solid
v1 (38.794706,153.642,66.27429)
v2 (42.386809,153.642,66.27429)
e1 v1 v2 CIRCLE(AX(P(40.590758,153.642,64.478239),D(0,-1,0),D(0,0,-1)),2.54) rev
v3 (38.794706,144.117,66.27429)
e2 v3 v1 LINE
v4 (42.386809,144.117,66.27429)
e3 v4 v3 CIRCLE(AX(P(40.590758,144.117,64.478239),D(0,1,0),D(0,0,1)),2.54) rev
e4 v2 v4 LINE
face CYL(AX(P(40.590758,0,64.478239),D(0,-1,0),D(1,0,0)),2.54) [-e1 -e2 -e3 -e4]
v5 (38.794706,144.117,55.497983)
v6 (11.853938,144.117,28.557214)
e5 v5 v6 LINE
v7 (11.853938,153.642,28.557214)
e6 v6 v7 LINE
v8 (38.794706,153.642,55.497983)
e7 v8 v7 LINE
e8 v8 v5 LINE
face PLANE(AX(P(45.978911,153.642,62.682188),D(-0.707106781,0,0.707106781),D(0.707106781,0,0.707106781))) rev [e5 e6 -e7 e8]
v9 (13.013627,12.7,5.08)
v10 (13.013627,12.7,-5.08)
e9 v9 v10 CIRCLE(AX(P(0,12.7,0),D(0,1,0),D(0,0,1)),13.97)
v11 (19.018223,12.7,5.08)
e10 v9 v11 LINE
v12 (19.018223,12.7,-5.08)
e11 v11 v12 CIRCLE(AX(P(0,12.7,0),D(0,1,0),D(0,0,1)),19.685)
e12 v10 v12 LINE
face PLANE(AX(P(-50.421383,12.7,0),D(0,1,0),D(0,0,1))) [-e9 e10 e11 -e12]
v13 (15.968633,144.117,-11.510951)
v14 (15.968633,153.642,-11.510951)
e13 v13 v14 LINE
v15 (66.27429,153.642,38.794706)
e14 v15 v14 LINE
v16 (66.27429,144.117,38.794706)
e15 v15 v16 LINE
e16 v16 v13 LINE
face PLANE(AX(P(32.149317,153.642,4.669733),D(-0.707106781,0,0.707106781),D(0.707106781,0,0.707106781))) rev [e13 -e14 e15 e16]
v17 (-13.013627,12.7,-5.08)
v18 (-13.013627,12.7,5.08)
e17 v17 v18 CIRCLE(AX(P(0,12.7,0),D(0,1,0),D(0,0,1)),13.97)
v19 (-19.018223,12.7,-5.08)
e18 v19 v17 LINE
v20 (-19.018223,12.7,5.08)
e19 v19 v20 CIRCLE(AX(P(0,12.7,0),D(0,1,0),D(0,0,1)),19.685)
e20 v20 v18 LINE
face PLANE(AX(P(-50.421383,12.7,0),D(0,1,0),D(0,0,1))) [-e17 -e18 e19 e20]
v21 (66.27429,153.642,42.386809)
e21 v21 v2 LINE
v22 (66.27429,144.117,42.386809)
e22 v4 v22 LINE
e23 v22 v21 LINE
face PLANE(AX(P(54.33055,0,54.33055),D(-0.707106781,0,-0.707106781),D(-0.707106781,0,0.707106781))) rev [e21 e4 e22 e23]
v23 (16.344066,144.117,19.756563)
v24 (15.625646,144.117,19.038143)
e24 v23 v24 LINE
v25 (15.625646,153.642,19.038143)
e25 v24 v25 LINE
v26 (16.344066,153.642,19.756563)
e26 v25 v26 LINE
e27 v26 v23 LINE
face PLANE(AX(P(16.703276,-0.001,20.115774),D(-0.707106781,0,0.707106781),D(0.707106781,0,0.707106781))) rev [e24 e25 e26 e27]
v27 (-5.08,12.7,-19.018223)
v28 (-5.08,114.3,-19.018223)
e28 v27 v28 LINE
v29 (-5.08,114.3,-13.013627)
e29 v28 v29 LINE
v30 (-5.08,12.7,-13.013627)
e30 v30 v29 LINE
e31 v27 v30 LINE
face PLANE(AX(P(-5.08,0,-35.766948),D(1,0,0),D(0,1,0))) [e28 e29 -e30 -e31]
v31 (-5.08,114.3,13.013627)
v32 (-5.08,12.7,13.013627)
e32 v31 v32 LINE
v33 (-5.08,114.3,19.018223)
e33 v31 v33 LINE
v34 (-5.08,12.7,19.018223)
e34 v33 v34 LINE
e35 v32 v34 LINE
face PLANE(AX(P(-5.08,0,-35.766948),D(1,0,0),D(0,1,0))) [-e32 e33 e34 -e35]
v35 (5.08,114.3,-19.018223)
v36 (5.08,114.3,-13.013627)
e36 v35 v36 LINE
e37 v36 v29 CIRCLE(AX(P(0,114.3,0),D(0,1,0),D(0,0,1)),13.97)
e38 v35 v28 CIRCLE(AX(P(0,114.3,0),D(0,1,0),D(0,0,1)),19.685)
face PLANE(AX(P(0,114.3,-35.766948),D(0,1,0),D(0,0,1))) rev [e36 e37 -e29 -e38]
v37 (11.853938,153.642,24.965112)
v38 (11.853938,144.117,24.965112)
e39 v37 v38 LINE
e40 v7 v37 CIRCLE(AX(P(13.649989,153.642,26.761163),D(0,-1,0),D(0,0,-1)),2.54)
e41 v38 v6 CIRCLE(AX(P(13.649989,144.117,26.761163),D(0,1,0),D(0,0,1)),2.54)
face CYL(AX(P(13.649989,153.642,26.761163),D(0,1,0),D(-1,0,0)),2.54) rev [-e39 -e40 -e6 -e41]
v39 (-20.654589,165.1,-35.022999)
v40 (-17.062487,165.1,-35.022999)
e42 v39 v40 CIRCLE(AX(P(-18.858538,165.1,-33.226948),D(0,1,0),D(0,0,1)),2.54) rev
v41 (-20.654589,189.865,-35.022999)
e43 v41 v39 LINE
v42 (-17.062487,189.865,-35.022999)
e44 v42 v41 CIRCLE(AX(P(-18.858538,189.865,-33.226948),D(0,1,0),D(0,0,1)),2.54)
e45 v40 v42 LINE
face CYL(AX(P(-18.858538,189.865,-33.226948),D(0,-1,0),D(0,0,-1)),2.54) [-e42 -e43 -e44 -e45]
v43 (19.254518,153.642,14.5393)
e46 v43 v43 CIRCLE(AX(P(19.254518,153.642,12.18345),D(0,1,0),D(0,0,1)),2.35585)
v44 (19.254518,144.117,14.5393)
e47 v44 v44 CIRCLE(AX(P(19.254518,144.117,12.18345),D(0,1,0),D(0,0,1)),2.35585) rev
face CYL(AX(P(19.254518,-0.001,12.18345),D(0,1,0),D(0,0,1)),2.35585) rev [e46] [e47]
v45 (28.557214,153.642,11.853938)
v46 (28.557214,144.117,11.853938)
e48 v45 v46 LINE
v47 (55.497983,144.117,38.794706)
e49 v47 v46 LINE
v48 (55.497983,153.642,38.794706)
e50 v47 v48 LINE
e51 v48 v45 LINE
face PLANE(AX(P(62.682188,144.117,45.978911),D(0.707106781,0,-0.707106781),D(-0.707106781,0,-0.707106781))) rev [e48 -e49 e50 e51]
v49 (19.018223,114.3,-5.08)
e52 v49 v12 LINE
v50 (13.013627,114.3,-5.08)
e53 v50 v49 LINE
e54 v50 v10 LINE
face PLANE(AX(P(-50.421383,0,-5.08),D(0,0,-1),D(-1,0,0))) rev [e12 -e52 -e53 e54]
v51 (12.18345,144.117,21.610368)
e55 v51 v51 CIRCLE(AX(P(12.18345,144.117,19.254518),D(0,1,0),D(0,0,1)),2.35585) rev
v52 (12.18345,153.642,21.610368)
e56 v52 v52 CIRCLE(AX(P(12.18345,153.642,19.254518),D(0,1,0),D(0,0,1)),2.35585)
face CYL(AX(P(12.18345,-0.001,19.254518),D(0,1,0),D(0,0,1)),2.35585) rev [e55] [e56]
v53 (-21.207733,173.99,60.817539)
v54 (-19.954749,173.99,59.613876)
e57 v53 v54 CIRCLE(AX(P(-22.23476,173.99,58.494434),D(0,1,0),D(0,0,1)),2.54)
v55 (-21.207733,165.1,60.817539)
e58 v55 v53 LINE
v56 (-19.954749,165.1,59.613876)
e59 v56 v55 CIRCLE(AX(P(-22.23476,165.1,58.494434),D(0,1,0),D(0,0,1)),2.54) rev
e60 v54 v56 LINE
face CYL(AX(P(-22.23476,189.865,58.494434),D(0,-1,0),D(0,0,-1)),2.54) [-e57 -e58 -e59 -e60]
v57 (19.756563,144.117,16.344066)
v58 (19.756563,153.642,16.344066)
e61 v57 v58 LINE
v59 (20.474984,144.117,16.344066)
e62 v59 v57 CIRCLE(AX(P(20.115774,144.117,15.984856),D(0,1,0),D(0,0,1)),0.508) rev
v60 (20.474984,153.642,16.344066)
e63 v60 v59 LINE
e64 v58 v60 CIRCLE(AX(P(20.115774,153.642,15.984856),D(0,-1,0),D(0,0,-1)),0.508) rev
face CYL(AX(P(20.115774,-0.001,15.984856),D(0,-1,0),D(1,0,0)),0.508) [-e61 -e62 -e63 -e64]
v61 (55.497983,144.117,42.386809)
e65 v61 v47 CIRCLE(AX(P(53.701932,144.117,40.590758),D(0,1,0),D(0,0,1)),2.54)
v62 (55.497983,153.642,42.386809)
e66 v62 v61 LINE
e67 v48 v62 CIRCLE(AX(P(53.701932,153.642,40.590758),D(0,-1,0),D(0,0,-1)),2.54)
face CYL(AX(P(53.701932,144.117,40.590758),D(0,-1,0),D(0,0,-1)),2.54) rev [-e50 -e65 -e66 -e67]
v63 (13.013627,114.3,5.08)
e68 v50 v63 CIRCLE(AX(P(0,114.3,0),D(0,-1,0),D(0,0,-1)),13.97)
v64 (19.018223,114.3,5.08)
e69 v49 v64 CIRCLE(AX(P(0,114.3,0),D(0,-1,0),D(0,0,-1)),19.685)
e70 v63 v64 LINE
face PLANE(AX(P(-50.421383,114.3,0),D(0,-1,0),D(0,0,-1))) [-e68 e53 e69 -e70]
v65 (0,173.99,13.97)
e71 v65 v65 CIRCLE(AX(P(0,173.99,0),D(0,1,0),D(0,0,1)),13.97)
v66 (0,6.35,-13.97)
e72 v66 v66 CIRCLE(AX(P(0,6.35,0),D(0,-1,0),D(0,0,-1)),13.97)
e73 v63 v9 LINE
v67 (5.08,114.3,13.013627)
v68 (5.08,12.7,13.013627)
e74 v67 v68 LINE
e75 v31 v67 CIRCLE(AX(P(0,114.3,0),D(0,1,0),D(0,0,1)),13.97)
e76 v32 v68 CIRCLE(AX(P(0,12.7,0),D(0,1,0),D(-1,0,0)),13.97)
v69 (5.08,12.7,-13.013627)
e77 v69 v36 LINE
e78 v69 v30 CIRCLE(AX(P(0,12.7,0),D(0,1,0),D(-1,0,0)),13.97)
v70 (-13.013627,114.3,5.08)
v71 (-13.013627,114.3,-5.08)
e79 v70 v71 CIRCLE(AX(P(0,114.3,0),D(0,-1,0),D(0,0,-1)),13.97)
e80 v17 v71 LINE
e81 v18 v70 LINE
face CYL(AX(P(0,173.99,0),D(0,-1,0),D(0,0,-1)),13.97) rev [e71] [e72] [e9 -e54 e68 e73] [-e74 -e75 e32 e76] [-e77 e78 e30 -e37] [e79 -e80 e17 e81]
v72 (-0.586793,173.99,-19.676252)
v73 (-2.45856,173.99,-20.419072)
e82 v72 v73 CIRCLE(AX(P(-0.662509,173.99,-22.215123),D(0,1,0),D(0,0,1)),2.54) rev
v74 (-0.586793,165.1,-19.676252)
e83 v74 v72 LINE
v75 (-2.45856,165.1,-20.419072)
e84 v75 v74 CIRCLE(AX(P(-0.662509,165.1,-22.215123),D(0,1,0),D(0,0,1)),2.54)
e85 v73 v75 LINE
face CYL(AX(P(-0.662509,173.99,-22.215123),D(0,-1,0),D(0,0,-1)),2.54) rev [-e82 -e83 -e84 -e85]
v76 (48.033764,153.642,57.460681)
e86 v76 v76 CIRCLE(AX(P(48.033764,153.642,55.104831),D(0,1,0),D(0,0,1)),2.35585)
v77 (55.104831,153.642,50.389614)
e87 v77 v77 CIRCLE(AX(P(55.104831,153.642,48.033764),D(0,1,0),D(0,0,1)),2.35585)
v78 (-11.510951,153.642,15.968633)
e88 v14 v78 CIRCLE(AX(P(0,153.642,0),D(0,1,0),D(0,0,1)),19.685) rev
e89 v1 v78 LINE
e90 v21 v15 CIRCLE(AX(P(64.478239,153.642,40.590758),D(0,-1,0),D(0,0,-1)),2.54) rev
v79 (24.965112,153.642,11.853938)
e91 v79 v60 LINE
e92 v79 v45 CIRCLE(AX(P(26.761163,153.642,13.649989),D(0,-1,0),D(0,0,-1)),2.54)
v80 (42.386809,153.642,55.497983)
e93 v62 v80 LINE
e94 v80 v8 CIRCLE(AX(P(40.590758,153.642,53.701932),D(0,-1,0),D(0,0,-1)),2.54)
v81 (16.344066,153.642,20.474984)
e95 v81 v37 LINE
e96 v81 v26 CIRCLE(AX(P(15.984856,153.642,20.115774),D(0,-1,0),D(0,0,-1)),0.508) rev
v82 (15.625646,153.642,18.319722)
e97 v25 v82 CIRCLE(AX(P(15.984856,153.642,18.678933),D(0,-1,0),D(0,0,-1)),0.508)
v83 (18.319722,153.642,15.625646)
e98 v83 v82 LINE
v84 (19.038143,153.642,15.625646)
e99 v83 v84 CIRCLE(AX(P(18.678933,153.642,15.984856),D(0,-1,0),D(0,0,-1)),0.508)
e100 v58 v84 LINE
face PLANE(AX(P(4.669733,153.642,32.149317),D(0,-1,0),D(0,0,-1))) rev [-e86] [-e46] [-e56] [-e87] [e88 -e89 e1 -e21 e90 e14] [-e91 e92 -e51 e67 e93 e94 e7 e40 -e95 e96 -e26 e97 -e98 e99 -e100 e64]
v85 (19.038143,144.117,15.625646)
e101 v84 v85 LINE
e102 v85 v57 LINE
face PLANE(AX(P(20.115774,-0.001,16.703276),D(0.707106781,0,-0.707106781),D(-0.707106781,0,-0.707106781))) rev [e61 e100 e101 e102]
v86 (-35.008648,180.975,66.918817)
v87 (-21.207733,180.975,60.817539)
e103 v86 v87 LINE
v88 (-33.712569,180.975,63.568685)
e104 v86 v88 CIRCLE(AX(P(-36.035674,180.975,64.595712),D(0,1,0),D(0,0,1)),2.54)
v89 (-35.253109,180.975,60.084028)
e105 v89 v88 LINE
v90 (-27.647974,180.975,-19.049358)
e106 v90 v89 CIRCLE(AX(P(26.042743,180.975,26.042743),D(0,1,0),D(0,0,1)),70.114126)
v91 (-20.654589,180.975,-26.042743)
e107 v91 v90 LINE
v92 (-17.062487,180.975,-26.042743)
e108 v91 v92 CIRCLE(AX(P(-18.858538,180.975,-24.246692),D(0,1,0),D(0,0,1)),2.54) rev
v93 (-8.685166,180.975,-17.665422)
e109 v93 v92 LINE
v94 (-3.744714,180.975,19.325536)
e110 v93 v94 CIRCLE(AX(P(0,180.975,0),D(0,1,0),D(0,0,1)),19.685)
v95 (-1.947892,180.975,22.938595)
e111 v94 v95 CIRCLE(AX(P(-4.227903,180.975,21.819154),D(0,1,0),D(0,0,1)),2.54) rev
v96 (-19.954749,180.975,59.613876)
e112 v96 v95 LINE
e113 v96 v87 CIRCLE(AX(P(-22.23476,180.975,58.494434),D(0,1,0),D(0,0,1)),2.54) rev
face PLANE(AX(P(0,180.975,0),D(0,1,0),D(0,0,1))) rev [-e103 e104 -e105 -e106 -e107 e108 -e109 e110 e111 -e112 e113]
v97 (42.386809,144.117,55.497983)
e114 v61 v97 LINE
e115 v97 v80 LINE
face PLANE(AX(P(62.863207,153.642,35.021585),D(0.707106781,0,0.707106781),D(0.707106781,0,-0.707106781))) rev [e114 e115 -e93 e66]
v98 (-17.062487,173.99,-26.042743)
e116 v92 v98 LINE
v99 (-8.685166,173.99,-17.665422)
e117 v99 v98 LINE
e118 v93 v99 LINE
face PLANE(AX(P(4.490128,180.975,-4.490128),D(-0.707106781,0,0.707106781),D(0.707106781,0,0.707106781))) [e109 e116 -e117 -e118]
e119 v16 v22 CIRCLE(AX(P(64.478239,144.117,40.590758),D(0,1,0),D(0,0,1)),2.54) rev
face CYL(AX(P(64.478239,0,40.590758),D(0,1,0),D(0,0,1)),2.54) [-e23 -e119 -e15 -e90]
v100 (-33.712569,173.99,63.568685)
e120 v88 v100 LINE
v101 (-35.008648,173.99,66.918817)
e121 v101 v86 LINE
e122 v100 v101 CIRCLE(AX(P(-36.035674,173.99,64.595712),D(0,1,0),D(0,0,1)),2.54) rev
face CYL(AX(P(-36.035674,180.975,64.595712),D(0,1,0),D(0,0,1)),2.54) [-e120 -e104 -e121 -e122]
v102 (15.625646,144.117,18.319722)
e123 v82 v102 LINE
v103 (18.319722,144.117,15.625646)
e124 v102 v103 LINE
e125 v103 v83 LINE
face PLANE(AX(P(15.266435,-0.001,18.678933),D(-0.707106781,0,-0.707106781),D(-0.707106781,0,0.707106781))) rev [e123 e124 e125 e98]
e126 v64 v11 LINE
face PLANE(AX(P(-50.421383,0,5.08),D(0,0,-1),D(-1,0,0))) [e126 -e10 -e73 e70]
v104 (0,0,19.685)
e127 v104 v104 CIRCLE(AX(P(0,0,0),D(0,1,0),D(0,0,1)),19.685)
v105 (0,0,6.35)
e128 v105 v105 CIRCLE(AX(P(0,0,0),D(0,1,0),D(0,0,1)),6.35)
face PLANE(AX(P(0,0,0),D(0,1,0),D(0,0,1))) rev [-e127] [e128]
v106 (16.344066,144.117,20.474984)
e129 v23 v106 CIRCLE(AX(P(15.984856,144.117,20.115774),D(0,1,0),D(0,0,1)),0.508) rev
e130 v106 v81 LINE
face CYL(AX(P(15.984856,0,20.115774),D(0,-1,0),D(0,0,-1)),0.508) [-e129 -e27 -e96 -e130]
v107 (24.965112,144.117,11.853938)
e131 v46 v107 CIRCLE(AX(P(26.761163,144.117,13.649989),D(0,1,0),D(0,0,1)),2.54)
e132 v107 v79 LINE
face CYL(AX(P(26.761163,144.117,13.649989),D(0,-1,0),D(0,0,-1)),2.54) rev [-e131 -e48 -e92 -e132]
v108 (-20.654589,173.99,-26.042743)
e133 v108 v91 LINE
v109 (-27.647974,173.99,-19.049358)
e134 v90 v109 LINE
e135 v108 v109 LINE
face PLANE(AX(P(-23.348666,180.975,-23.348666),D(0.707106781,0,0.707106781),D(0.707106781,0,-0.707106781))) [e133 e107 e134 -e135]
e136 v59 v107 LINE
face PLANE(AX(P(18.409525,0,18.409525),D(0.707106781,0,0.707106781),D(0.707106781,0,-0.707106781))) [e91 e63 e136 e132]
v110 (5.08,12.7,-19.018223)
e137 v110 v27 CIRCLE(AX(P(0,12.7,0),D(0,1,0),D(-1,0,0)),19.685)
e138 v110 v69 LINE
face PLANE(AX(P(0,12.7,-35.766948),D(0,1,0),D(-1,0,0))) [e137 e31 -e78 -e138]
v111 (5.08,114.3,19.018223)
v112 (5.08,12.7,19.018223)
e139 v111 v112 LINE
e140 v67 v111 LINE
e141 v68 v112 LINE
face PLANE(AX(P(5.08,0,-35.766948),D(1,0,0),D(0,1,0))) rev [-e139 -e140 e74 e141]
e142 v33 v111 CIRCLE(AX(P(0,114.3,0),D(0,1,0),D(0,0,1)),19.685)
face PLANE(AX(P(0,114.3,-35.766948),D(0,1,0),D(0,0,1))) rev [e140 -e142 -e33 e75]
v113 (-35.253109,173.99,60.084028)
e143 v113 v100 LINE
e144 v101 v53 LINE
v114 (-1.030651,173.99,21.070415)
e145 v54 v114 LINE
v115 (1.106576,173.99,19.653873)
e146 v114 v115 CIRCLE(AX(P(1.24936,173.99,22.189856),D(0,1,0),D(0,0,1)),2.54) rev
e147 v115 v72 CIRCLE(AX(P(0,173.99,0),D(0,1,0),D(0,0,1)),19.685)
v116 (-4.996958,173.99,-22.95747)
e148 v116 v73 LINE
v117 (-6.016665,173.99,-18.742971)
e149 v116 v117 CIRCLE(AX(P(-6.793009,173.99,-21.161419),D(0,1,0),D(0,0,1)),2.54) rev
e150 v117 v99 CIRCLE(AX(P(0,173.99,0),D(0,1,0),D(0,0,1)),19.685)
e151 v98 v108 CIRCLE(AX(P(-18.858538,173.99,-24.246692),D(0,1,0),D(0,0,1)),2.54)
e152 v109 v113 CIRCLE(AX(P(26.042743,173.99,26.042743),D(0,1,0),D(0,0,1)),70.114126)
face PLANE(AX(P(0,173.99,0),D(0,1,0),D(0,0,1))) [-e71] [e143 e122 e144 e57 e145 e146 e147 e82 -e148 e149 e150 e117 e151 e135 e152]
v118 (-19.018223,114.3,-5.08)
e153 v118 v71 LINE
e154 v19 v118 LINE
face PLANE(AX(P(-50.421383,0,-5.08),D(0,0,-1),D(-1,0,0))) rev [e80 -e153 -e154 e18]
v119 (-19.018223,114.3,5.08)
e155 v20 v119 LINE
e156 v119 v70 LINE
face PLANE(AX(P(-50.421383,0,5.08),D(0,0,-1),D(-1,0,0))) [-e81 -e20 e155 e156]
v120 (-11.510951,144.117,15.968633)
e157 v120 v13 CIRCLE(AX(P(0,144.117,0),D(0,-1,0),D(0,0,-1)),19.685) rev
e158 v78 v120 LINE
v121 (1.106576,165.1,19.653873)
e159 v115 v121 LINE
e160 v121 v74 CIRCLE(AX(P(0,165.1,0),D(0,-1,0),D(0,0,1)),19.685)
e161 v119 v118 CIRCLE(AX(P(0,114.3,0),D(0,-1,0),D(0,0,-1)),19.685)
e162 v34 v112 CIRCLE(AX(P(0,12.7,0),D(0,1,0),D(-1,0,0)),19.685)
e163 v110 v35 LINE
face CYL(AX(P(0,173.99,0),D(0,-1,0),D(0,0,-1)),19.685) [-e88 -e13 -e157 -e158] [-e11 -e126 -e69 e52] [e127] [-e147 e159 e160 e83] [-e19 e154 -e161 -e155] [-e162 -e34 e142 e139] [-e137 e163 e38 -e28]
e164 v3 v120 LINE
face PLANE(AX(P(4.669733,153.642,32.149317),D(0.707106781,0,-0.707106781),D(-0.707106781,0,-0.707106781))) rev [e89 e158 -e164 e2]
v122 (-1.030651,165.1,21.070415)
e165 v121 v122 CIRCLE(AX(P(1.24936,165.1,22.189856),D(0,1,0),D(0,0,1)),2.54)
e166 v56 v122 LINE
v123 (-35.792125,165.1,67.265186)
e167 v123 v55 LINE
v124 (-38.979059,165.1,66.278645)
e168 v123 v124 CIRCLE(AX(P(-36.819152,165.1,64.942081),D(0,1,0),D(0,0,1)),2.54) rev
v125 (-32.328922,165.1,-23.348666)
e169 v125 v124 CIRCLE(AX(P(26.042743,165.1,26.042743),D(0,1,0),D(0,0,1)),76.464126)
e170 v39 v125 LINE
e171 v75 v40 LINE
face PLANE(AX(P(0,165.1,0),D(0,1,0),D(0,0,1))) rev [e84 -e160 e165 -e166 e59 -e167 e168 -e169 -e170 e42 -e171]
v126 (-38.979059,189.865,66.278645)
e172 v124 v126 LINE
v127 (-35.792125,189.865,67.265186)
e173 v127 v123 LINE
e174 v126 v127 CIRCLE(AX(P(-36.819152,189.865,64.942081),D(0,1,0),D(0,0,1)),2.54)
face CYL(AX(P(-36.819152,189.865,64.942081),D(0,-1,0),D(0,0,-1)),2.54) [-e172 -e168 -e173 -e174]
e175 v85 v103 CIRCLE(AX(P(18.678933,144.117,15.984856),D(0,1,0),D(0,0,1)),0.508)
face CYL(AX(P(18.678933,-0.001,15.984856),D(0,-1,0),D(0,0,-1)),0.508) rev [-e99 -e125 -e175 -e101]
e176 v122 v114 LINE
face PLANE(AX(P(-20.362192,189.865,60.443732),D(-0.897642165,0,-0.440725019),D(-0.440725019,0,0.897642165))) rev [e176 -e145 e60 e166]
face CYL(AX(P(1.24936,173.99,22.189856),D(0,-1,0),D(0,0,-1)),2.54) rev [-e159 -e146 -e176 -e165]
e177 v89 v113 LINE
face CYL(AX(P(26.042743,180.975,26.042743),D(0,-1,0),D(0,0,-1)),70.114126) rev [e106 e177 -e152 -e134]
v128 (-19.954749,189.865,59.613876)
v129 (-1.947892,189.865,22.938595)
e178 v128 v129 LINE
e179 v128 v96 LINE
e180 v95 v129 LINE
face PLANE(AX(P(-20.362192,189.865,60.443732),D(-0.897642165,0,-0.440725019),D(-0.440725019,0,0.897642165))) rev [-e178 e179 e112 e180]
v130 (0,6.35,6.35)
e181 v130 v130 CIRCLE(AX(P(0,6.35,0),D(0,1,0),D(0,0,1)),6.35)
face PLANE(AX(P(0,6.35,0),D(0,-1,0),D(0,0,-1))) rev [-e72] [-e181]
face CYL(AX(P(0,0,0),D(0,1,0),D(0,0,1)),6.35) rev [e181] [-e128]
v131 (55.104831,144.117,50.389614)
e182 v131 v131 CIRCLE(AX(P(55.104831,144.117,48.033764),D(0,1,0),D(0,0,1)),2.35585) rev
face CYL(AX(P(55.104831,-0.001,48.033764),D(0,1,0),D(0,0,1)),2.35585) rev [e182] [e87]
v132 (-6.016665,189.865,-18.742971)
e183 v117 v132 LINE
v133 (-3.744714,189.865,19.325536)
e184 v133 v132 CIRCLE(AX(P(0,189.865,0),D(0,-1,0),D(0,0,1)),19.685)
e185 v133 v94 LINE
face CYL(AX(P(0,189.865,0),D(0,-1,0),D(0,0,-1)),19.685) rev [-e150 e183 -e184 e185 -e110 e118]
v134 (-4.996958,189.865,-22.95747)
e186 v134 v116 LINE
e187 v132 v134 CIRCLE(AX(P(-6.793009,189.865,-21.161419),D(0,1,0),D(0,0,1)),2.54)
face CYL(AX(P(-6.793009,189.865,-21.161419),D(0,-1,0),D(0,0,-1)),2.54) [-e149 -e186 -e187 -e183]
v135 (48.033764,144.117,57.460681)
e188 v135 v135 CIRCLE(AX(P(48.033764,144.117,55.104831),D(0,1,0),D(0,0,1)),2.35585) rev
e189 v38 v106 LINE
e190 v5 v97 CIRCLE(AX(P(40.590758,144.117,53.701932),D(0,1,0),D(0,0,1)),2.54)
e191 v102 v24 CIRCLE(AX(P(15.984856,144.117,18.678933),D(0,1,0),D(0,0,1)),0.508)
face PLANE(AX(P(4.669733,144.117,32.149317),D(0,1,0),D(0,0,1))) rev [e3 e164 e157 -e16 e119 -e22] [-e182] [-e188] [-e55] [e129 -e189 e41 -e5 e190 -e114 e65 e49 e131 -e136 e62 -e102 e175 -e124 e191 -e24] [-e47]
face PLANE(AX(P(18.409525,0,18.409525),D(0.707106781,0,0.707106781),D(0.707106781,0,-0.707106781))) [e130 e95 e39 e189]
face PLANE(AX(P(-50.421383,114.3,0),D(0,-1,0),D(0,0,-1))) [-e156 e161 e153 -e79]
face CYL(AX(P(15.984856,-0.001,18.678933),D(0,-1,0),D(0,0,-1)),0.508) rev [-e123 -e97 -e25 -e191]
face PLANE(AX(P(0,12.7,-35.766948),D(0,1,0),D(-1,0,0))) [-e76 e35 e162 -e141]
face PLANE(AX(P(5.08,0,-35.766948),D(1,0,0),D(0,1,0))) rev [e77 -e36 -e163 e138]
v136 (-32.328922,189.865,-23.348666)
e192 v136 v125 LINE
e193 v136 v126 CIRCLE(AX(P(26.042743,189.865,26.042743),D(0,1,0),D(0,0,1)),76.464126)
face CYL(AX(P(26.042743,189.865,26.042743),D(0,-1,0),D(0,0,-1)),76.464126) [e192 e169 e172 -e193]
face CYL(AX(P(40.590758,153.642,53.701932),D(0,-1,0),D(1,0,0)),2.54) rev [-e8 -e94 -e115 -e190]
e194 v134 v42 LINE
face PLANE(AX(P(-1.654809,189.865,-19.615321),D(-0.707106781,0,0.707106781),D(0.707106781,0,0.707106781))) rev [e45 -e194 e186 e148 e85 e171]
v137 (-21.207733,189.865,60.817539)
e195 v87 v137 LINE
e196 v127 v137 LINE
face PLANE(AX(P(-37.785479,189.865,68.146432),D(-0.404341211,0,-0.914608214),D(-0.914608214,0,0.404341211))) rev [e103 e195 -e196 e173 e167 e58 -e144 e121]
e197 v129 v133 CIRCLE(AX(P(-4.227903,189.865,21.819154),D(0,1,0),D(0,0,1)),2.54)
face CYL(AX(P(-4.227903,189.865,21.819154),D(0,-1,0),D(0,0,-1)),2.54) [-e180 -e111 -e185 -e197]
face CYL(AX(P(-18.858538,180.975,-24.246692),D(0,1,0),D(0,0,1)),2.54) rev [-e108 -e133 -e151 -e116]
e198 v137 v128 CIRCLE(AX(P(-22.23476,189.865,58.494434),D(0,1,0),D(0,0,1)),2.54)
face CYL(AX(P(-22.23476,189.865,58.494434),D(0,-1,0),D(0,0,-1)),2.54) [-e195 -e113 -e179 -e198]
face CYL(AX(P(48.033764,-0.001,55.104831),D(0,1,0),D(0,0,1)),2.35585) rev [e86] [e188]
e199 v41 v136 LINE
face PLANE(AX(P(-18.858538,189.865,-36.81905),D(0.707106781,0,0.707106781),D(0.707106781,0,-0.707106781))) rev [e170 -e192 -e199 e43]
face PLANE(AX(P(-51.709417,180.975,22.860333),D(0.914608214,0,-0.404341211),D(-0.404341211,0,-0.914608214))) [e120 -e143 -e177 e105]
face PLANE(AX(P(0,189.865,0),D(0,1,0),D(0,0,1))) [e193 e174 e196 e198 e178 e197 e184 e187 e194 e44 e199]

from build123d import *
from build123d.topology import SkipClean

# Parameters (mm, degrees)
SKETCH1_R                            = 19.685
SKETCH1_R_2                          = 13.97
BOSS_EXTRUDE1_DEPTH                  = 173.99
SKETCH2_R                            = 13.97
BOSS_EXTRUDE2_DEPTH                  = 6.35
SKETCH7_R                            = 6.35
CUT_EXTRUDE4_DEPTH                   = 170.935776251
SKETCH9_W                            = 38.862
SKETCH9_H                            = 9.525
BOSS_EXTRUDE3_DEPTH                  = 6.35
BOSS_EXTRUDE3_DIRECTION_2_REACH      = 182.364
BOSS_EXTRUDE3_DIRECTION_2_END_RADIUS = 19.685
SKETCH10_W                           = 7.62
SKETCH10_H                           = 9.525
BOSS_EXTRUDE4_DEPTH                  = 50.8
BOSS_EXTRUDE5_REACH                  = 201.196
SKETCH11_W                           = 7.62
SKETCH11_H                           = 9.525
FILLET1_R                            = 2.54
CUT_EXTRUDE7_REACH                   = 182.524
SKETCH12_R                           = 2.35585
CUT_EXTRUDE9_REACH                   = 182.524
FILLET5_R                            = 0.508
BOSS_EXTRUDE6_DEPTH                  = 15.875
BOSS_EXTRUDE6_DEPTH_BACK             = 8.89
CUT_EXTRUDE10_DEPTH                  = 6.985
CUT_EXTRUDE11_DEPTH                  = 6.985
FILLET7_R                            = 2.54
FILLET8_R                            = 2.54
FILLET9_R                            = 2.54
CUT_EXTRUDE12_DEPTH                  = 213.353464491
CUT_EXTRUDE12_DEPTH_BACK             = 213.353464491
SKETCH5_W                            = 10.16
SKETCH5_H                            = 25.4
SKETCH5_H_2                          = 76.2
CUT_EXTRUDE13_DEPTH                  = 213.353464491
CUT_EXTRUDE13_DEPTH_BACK             = 213.353464491
SKETCH8_W                            = 10.16
SKETCH8_H                            = 25.4
SKETCH8_H_2                          = 76.2


with BuildPart() as part:
    # Sketch1 → Boss-Extrude1 (new body)
    with BuildSketch(Plane(origin=(0, 0, 0), x_dir=(1, 0, 0), z_dir=(0, 1, 0))):
        with Locations(Location((0, 0, 0), (0, 0, 270))):
            Circle(SKETCH1_R)
        with Locations(Location((0, 0, 0), (0, 0, 270))):
            Circle(SKETCH1_R_2, mode=Mode.SUBTRACT)
    extrude(amount=BOSS_EXTRUDE1_DEPTH)

    # Sketch2 → Boss-Extrude2 (add)
    with BuildSketch(Plane.XZ):
        with Locations(Location((0, 0, 0), (0, 0, 270))):
            Circle(SKETCH2_R)
    extrude(amount=-BOSS_EXTRUDE2_DEPTH)

    # Sketch7 → Cut-Extrude4 (cut, through all)
    with BuildSketch(Plane(origin=(0, 6.35, 0), x_dir=(1, 0, 0), z_dir=(0, 1, 0))):
        with Locations(Location((0, 0, 0), (0, 0, 270))):
            Circle(SKETCH7_R)
    extrude(amount=-CUT_EXTRUDE4_DEPTH, mode=Mode.SUBTRACT)

    # Sketch9 → Boss-Extrude3 (add)
    with BuildSketch(Plane(origin=(13.919396988, 0, 13.919396988), x_dir=(0.7071067811865476, 0, -0.7071067811865476), z_dir=(0.7071067811865476, 0, 0.7071067811865476))):
        with Locations((0, 148.8795)):
            Rectangle(SKETCH9_W, SKETCH9_H)
    extrude(amount=BOSS_EXTRUDE3_DEPTH)

    # Boss-Extrude3 direction 2: up to this cylinder (the profile starts outside it)
    boss_extrude3_direction_2_end = Plane(origin=(0, 148.8795, 0), z_dir=(0, -1, 0)) * Cylinder(BOSS_EXTRUDE3_DIRECTION_2_END_RADIUS, 405.098, mode=Mode.PRIVATE)
    # Sketch9 → Boss-Extrude3 direction 2 (add, up to the surface)
    with BuildSketch(Plane(origin=(13.919396988, 0, 13.919396988), x_dir=(0.7071067811865476, 0, -0.7071067811865476), z_dir=(0.7071067811865476, 0, 0.7071067811865476)), mode=Mode.PRIVATE) as boss_extrude3_direction_2_sk1:
        with Locations((0, 148.8795)):
            Rectangle(SKETCH9_W, SKETCH9_H)
    boss_extrude3_direction_2_tool1 = extrude(boss_extrude3_direction_2_sk1.sketch, amount=-BOSS_EXTRUDE3_DIRECTION_2_REACH, mode=Mode.PRIVATE) - boss_extrude3_direction_2_end
    add(boss_extrude3_direction_2_tool1.solids().sort_by_distance((13.919397, 148.8795, 13.919397))[0])
    add(boss_extrude3_direction_2_tool1.solids().sort_by_distance((13.919397, 148.8795, 13.919397))[1])

    # Sketch10 → Boss-Extrude4 (add)
    with BuildSketch(Plane(origin=(18.409525048, 0, 18.409525048), x_dir=(0.7071067811865481, 0, -0.707106781186547), z_dir=(0.707106781186547, 0, 0.7071067811865481))):
        with Locations((-15.621, 148.8795)):
            Rectangle(SKETCH10_W, SKETCH10_H)
        with Locations((15.621, 148.8795)):
            Rectangle(SKETCH10_W, SKETCH10_H)
    extrude(amount=BOSS_EXTRUDE4_DEPTH)

    # Sketch11 → Boss-Extrude5 (add, up to next)
    with BuildSketch(Plane(origin=(-8.351638193, 0, 8.351638193), x_dir=(-0.7071067811865471, 0, -0.7071067811865479), z_dir=(0.7071067811865479, 0, -0.7071067811865471)), mode=Mode.PRIVATE) as boss_extrude5_sk1:
        with Locations((-73.025, 148.8795)):
            Rectangle(SKETCH11_W, SKETCH11_H)
    boss_extrude5_tool1 = extrude(boss_extrude5_sk1.sketch, amount=BOSS_EXTRUDE5_REACH, mode=Mode.PRIVATE) - part.part
    add(boss_extrude5_tool1.solids().sort_by_distance((43.284835, 148.8795, 59.988111))[0])

    # Fillet1
    fillet1_edges = [part.edges().sort_by_distance(p)[0] for p in [
        (10.057886856, 148.8795, 26.761163241),
        (40.590757667, 148.8795, 68.070341398),
        (26.761163241, 148.8795, 10.057886856),
        (68.070341398, 148.8795, 40.590757667),
        (57.294034052, 148.8795, 40.590757667),
        (40.590757667, 148.8795, 57.294034052),
    ]]
    fillet(fillet1_edges, radius=FILLET1_R)

    # Sketch12 → Cut-Extrude7 (cut, up to next)
    with BuildSketch(Plane(origin=(0, 153.642, 0), x_dir=(1, 0, 0), z_dir=(0, 1, 0)), mode=Mode.PRIVATE) as cut_extrude7_sk1:
        with Locations(Location((48.033763646, -55.104831458, 0), (0, 0, 270))):
            Circle(SKETCH12_R)
    cut_extrude7_tool1 = extrude(cut_extrude7_sk1.sketch, amount=-CUT_EXTRUDE7_REACH, mode=Mode.PRIVATE) & part.part
    # Sketch12 → Cut-Extrude7 (cut, up to next)
    with BuildSketch(Plane(origin=(0, 153.642, 0), x_dir=(1, 0, 0), z_dir=(0, 1, 0)), mode=Mode.PRIVATE) as cut_extrude7_sk2:
        with Locations(Location((55.104831458, -48.033763646, 0), (0, 0, 270))):
            Circle(SKETCH12_R)
    cut_extrude7_tool2 = extrude(cut_extrude7_sk2.sketch, amount=-CUT_EXTRUDE7_REACH, mode=Mode.PRIVATE) & part.part
    # Sketch12 → Cut-Extrude7 (cut, up to next)
    with BuildSketch(Plane(origin=(0, 153.642, 0), x_dir=(1, 0, 0), z_dir=(0, 1, 0)), mode=Mode.PRIVATE) as cut_extrude7_sk3:
        with Locations(Location((19.254517652, -12.18344984, 0), (0, 0, 270))):
            Circle(SKETCH12_R)
    cut_extrude7_tool3 = extrude(cut_extrude7_sk3.sketch, amount=-CUT_EXTRUDE7_REACH, mode=Mode.PRIVATE) & part.part
    # Sketch12 → Cut-Extrude7 (cut, up to next)
    with BuildSketch(Plane(origin=(0, 153.642, 0), x_dir=(1, 0, 0), z_dir=(0, 1, 0)), mode=Mode.PRIVATE) as cut_extrude7_sk4:
        with Locations(Location((12.18344984, -19.254517652, 0), (0, 0, 270))):
            Circle(SKETCH12_R)
    cut_extrude7_tool4 = extrude(cut_extrude7_sk4.sketch, amount=-CUT_EXTRUDE7_REACH, mode=Mode.PRIVATE) & part.part
    add(cut_extrude7_tool1.solids().sort_by_distance((48.033764, 153.642, 55.104831))[0], mode=Mode.SUBTRACT)
    add(cut_extrude7_tool2.solids().sort_by_distance((55.104831, 153.642, 48.033764))[0], mode=Mode.SUBTRACT)
    add(cut_extrude7_tool3.solids().sort_by_distance((19.254518, 153.642, 12.18345))[0], mode=Mode.SUBTRACT)
    add(cut_extrude7_tool4.solids().sort_by_distance((12.18345, 153.642, 19.254518))[0], mode=Mode.SUBTRACT)

    # Sketch22 → Cut-Extrude9 (cut, up to next)
    with BuildSketch(Plane(origin=(0, 153.642, 0), x_dir=(1, 0, 0), z_dir=(0, 1, 0)), mode=Mode.PRIVATE) as cut_extrude9_sk1:
        Polygon((16.703276385, -20.115773711), (20.115773711, -16.703276385), (18.678932732, -15.266435406), (15.266435406, -18.678932732), align=None)
    cut_extrude9_tool1 = extrude(cut_extrude9_sk1.sketch, amount=-CUT_EXTRUDE9_REACH, mode=Mode.PRIVATE) & part.part
    add(cut_extrude9_tool1.solids().sort_by_distance((17.691105, 153.642, 17.691105))[0], mode=Mode.SUBTRACT)

    # Fillet5
    fillet5_edges = [part.edges().sort_by_distance(p)[0] for p in [
        (16.703276385, 148.8795, 20.115773711),
        (15.266435406, 148.8795, 18.678932732),
        (18.678932732, 148.8795, 15.266435406),
        (20.115773711, 148.8795, 16.703276385),
    ]]
    fillet(fillet5_edges, radius=FILLET5_R)

    # Sketch24 → Boss-Extrude6 (add, two sides: drawn at the far end of the back side and taken through both)
    with BuildSketch(Plane(origin=(0, 173.99, 0), x_dir=(1, 0, 0), z_dir=(0, 1, 0)).offset(-BOSS_EXTRUDE6_DEPTH_BACK)):
        with BuildLine():
            Line((-1.654809111, 19.615321354), (-18.858537854, 36.819050096))
            Line((-18.858537854, 36.819050096), (-32.328922036, 23.348665915))
            ThreePointArc((-32.328922036, 23.348665915), (-50.285766243, -21.490686658), (-37.785478501, -68.146432278))
            Line((-37.785478501, -68.146432278), (-20.362192025, -60.443732207))
            Line((-20.362192025, -60.443732207), (-0.348920906, -19.681907408))
            ThreePointArc((-0.348920906, -19.681907408), (-19.674139894, -0.653792342), (-1.654809111, 19.615321354))
        make_face()
    extrude(amount=BOSS_EXTRUDE6_DEPTH + BOSS_EXTRUDE6_DEPTH_BACK)

    # Sketch25 → Cut-Extrude10 (cut)
    with BuildSketch(Plane(origin=(0, 173.99, 0), x_dir=(1, 0, 0), z_dir=(0, 1, 0))):
        with BuildLine():
            ThreePointArc((-27.647974301, 19.049357529), (-43.749813849, -19.335310427), (-35.25310949, -60.084028026))
            Line((-35.25310949, -60.084028026), (-22.929758715, -54.635970049))
            Line((-22.929758715, -54.635970049), (-16.008337298, -51.576063222))
            Line((-16.008337298, -51.576063222), (-0.348920906, -19.681907408))
            ThreePointArc((-0.348920906, -19.681907408), (-19.212220786, -4.288332714), (-8.685165579, 17.665421701))
            Line((-8.685165579, 17.665421701), (-18.858537854, 27.838793975))
            Line((-18.858537854, 27.838793975), (-27.647974301, 19.049357529))
        make_face()
    extrude(amount=CUT_EXTRUDE10_DEPTH, mode=Mode.SUBTRACT)

    # Sketch25<3> → Cut-Extrude11 (cut)
    with BuildSketch(Plane(origin=(0, 173.99, 0), x_dir=(1, 0, 0), z_dir=(0, 1, 0))):
        Polygon((-22.929758715, -54.635970049), (-35.25310949, -60.084028026), (-32.6855428, -65.891790185), (-20.362192025, -60.443732207), (-16.008337298, -51.576063222), align=None)
    extrude(amount=CUT_EXTRUDE11_DEPTH, mode=Mode.SUBTRACT)

    # Fillet7
    # the kernel refuses this fillet: 2.54 mm, written as the material it adds along each edge
    with BuildSketch(Plane(origin=(-0.348920906, 173.99, 19.681907408), x_dir=(0.9998145543990907, 0, -0.01925764294371538), z_dir=(0, -1, 0))) as fillet7_piece_1:
        with BuildLine():
            CenterArc((1.549687123, 2.538262979), FILLET7_R, 207.253599252, 60.627317533)
            Line((-0.708343353, 1.375121386), (0, 0))
            ThreePointArc((0, 0), (0.727883346, 0.01346191), (1.455766692, 0))
        make_face()
    extrude(amount=8.89)
    with BuildSketch(Plane(origin=(-18.858537854, 167.64, -27.838793975), x_dir=(-0.7071067811865475, 0, 0.7071067811865475), z_dir=(0, 1, 0))) as fillet7_piece_2:
        with BuildLine():
            CenterArc((FILLET7_R, FILLET7_R), FILLET7_R, 180, 90)
            Line((0, FILLET7_R), (0, 0))
            Line((0, 0), (FILLET7_R, 0))
        make_face()
    extrude(amount=19.685)
    # the kernel refuses this fillet: 2.54 mm, written as the material it takes off along each edge
    with BuildSketch(Plane(origin=(-0.348920906, 198.935116734, 19.681907408), x_dir=(-0.4407250194044606, 0, 0.8976421654929864), z_dir=(0, -1, 0))) as fillet7_2_piece_1_section:
        with BuildLine():
            CenterArc((3.628046694, 2.54), FILLET7_R, 164.816165864, 105.183834136)
            ThreePointArc((1.176716996, 3.205268904), (0.657985503, 1.577073014), (0, 0))
            Line((0, 0), (3.628046694, 0))
        make_face()
    fillet7_2_piece_1 = extrude(amount=27.030233469, mode=Mode.PRIVATE)
    fillet7_2_piece_1 = split(fillet7_2_piece_1, bisect_by=Plane(origin=(-1.547722255, 173.99, 20.415645586), z_dir=(0, 1, 0)), keep=Keep.TOP, mode=Mode.PRIVATE)
    add(fillet7_2_piece_1, mode=Mode.SUBTRACT)
    with BuildSketch(Plane(origin=(-37.785478501, 159.558530429, 68.146432278), x_dir=(-0.5384763243852061, 0, -0.8426406399388758), z_dir=(0, 1, 0))) as fillet7_2_piece_2:
        with BuildLine():
            CenterArc((2.179772309, -2.539733178), FILLET7_R, 89.169508748, 82.100366111)
            Line((-0.33079981, -2.154210626), (0, 0))
            ThreePointArc((0, 0), (1.108293914, 0.008032394), (2.216587829, 0))
        make_face()
    extrude(amount=35.847939143, mode=Mode.SUBTRACT)
    with BuildSketch(Plane(origin=(-20.362192025, 192.176210988, 60.443732207), x_dir=(-0.9146082139693783, 0, 0.40434121103313725), z_dir=(0, -1, 0)), Plane(origin=(-20.362192025, 176.301210988, 60.443732207), x_dir=(-0.9146082139693783, 0, 0.40434121103313725), z_dir=(0, -1, 0))) as fillet7_2_piece_3:
        with BuildLine():
            CenterArc((FILLET7_R * 0.363970234266, FILLET7_R), FILLET7_R, 230, 40)
            Line((-FILLET7_R * 0.27881737542, FILLET7_R * 0.233955556881), (0, 0))
            Line((0, 0), (FILLET7_R * 0.363970234266, 0))
        make_face()
    extrude(amount=13.512421975, mode=Mode.SUBTRACT)
    with BuildSketch(Plane(origin=(-32.6855428, 173.99, 65.891790185), x_dir=(-0.9146082139693789, 0, 0.4043412110331356), z_dir=(0, 1, 0))) as fillet7_2_piece_4:
        with BuildLine():
            CenterArc((FILLET7_R, -FILLET7_R), FILLET7_R, 90, 90)
            Line((0, -FILLET7_R), (0, 0))
            Line((0, 0), (FILLET7_R, 0))
        make_face()
    extrude(amount=6.985, mode=Mode.SUBTRACT)

    # Fillet8
    fillet8_edges = [part.edges().sort_by_distance(p)[0] for p in [
        (-1.654809111, 181.9275, -19.615321354),
        (-18.858537854, 177.4825, -36.819050096),
    ]]
    fillet(fillet8_edges, radius=FILLET8_R)

    # Fillet9
    fillet9_edges = [part.edges().sort_by_distance(p)[0] for p in [
        (-1.654809111, 169.545, -19.615321354),
    ]]
    fillet(fillet9_edges, radius=FILLET9_R)

    # Sketch5 → Cut-Extrude12 (cut, two sides: drawn at the far end of the back side and taken through both)
    with SkipClean():  # the faces are left unmerged after this step: merging them gives an invalid solid
        with BuildSketch(Plane(origin=(0, 0, 0), x_dir=(0, 0, -1), z_dir=(1, 0, 0)).offset(-CUT_EXTRUDE12_DEPTH_BACK)):
            with Locations((0, 101.6)):
                Rectangle(SKETCH5_W, SKETCH5_H)
            with Locations((0, 50.8)):
                Rectangle(SKETCH5_W, SKETCH5_H_2)
        extrude(amount=CUT_EXTRUDE12_DEPTH + CUT_EXTRUDE12_DEPTH_BACK, mode=Mode.SUBTRACT)

    # Sketch8 → Cut-Extrude13 (cut, two sides: drawn at the far end of the back side and taken through both)
    with SkipClean():  # the faces are left unmerged after this step: merging them gives an invalid solid
        with BuildSketch(Plane.XY.offset(-CUT_EXTRUDE13_DEPTH_BACK)):
            with Locations((0, 101.6)):
                Rectangle(SKETCH8_W, SKETCH8_H)
            with Locations((0, 50.8)):
                Rectangle(SKETCH8_W, SKETCH8_H_2)
        extrude(amount=CUT_EXTRUDE13_DEPTH + CUT_EXTRUDE13_DEPTH_BACK, mode=Mode.SUBTRACT)


solid = part.part
